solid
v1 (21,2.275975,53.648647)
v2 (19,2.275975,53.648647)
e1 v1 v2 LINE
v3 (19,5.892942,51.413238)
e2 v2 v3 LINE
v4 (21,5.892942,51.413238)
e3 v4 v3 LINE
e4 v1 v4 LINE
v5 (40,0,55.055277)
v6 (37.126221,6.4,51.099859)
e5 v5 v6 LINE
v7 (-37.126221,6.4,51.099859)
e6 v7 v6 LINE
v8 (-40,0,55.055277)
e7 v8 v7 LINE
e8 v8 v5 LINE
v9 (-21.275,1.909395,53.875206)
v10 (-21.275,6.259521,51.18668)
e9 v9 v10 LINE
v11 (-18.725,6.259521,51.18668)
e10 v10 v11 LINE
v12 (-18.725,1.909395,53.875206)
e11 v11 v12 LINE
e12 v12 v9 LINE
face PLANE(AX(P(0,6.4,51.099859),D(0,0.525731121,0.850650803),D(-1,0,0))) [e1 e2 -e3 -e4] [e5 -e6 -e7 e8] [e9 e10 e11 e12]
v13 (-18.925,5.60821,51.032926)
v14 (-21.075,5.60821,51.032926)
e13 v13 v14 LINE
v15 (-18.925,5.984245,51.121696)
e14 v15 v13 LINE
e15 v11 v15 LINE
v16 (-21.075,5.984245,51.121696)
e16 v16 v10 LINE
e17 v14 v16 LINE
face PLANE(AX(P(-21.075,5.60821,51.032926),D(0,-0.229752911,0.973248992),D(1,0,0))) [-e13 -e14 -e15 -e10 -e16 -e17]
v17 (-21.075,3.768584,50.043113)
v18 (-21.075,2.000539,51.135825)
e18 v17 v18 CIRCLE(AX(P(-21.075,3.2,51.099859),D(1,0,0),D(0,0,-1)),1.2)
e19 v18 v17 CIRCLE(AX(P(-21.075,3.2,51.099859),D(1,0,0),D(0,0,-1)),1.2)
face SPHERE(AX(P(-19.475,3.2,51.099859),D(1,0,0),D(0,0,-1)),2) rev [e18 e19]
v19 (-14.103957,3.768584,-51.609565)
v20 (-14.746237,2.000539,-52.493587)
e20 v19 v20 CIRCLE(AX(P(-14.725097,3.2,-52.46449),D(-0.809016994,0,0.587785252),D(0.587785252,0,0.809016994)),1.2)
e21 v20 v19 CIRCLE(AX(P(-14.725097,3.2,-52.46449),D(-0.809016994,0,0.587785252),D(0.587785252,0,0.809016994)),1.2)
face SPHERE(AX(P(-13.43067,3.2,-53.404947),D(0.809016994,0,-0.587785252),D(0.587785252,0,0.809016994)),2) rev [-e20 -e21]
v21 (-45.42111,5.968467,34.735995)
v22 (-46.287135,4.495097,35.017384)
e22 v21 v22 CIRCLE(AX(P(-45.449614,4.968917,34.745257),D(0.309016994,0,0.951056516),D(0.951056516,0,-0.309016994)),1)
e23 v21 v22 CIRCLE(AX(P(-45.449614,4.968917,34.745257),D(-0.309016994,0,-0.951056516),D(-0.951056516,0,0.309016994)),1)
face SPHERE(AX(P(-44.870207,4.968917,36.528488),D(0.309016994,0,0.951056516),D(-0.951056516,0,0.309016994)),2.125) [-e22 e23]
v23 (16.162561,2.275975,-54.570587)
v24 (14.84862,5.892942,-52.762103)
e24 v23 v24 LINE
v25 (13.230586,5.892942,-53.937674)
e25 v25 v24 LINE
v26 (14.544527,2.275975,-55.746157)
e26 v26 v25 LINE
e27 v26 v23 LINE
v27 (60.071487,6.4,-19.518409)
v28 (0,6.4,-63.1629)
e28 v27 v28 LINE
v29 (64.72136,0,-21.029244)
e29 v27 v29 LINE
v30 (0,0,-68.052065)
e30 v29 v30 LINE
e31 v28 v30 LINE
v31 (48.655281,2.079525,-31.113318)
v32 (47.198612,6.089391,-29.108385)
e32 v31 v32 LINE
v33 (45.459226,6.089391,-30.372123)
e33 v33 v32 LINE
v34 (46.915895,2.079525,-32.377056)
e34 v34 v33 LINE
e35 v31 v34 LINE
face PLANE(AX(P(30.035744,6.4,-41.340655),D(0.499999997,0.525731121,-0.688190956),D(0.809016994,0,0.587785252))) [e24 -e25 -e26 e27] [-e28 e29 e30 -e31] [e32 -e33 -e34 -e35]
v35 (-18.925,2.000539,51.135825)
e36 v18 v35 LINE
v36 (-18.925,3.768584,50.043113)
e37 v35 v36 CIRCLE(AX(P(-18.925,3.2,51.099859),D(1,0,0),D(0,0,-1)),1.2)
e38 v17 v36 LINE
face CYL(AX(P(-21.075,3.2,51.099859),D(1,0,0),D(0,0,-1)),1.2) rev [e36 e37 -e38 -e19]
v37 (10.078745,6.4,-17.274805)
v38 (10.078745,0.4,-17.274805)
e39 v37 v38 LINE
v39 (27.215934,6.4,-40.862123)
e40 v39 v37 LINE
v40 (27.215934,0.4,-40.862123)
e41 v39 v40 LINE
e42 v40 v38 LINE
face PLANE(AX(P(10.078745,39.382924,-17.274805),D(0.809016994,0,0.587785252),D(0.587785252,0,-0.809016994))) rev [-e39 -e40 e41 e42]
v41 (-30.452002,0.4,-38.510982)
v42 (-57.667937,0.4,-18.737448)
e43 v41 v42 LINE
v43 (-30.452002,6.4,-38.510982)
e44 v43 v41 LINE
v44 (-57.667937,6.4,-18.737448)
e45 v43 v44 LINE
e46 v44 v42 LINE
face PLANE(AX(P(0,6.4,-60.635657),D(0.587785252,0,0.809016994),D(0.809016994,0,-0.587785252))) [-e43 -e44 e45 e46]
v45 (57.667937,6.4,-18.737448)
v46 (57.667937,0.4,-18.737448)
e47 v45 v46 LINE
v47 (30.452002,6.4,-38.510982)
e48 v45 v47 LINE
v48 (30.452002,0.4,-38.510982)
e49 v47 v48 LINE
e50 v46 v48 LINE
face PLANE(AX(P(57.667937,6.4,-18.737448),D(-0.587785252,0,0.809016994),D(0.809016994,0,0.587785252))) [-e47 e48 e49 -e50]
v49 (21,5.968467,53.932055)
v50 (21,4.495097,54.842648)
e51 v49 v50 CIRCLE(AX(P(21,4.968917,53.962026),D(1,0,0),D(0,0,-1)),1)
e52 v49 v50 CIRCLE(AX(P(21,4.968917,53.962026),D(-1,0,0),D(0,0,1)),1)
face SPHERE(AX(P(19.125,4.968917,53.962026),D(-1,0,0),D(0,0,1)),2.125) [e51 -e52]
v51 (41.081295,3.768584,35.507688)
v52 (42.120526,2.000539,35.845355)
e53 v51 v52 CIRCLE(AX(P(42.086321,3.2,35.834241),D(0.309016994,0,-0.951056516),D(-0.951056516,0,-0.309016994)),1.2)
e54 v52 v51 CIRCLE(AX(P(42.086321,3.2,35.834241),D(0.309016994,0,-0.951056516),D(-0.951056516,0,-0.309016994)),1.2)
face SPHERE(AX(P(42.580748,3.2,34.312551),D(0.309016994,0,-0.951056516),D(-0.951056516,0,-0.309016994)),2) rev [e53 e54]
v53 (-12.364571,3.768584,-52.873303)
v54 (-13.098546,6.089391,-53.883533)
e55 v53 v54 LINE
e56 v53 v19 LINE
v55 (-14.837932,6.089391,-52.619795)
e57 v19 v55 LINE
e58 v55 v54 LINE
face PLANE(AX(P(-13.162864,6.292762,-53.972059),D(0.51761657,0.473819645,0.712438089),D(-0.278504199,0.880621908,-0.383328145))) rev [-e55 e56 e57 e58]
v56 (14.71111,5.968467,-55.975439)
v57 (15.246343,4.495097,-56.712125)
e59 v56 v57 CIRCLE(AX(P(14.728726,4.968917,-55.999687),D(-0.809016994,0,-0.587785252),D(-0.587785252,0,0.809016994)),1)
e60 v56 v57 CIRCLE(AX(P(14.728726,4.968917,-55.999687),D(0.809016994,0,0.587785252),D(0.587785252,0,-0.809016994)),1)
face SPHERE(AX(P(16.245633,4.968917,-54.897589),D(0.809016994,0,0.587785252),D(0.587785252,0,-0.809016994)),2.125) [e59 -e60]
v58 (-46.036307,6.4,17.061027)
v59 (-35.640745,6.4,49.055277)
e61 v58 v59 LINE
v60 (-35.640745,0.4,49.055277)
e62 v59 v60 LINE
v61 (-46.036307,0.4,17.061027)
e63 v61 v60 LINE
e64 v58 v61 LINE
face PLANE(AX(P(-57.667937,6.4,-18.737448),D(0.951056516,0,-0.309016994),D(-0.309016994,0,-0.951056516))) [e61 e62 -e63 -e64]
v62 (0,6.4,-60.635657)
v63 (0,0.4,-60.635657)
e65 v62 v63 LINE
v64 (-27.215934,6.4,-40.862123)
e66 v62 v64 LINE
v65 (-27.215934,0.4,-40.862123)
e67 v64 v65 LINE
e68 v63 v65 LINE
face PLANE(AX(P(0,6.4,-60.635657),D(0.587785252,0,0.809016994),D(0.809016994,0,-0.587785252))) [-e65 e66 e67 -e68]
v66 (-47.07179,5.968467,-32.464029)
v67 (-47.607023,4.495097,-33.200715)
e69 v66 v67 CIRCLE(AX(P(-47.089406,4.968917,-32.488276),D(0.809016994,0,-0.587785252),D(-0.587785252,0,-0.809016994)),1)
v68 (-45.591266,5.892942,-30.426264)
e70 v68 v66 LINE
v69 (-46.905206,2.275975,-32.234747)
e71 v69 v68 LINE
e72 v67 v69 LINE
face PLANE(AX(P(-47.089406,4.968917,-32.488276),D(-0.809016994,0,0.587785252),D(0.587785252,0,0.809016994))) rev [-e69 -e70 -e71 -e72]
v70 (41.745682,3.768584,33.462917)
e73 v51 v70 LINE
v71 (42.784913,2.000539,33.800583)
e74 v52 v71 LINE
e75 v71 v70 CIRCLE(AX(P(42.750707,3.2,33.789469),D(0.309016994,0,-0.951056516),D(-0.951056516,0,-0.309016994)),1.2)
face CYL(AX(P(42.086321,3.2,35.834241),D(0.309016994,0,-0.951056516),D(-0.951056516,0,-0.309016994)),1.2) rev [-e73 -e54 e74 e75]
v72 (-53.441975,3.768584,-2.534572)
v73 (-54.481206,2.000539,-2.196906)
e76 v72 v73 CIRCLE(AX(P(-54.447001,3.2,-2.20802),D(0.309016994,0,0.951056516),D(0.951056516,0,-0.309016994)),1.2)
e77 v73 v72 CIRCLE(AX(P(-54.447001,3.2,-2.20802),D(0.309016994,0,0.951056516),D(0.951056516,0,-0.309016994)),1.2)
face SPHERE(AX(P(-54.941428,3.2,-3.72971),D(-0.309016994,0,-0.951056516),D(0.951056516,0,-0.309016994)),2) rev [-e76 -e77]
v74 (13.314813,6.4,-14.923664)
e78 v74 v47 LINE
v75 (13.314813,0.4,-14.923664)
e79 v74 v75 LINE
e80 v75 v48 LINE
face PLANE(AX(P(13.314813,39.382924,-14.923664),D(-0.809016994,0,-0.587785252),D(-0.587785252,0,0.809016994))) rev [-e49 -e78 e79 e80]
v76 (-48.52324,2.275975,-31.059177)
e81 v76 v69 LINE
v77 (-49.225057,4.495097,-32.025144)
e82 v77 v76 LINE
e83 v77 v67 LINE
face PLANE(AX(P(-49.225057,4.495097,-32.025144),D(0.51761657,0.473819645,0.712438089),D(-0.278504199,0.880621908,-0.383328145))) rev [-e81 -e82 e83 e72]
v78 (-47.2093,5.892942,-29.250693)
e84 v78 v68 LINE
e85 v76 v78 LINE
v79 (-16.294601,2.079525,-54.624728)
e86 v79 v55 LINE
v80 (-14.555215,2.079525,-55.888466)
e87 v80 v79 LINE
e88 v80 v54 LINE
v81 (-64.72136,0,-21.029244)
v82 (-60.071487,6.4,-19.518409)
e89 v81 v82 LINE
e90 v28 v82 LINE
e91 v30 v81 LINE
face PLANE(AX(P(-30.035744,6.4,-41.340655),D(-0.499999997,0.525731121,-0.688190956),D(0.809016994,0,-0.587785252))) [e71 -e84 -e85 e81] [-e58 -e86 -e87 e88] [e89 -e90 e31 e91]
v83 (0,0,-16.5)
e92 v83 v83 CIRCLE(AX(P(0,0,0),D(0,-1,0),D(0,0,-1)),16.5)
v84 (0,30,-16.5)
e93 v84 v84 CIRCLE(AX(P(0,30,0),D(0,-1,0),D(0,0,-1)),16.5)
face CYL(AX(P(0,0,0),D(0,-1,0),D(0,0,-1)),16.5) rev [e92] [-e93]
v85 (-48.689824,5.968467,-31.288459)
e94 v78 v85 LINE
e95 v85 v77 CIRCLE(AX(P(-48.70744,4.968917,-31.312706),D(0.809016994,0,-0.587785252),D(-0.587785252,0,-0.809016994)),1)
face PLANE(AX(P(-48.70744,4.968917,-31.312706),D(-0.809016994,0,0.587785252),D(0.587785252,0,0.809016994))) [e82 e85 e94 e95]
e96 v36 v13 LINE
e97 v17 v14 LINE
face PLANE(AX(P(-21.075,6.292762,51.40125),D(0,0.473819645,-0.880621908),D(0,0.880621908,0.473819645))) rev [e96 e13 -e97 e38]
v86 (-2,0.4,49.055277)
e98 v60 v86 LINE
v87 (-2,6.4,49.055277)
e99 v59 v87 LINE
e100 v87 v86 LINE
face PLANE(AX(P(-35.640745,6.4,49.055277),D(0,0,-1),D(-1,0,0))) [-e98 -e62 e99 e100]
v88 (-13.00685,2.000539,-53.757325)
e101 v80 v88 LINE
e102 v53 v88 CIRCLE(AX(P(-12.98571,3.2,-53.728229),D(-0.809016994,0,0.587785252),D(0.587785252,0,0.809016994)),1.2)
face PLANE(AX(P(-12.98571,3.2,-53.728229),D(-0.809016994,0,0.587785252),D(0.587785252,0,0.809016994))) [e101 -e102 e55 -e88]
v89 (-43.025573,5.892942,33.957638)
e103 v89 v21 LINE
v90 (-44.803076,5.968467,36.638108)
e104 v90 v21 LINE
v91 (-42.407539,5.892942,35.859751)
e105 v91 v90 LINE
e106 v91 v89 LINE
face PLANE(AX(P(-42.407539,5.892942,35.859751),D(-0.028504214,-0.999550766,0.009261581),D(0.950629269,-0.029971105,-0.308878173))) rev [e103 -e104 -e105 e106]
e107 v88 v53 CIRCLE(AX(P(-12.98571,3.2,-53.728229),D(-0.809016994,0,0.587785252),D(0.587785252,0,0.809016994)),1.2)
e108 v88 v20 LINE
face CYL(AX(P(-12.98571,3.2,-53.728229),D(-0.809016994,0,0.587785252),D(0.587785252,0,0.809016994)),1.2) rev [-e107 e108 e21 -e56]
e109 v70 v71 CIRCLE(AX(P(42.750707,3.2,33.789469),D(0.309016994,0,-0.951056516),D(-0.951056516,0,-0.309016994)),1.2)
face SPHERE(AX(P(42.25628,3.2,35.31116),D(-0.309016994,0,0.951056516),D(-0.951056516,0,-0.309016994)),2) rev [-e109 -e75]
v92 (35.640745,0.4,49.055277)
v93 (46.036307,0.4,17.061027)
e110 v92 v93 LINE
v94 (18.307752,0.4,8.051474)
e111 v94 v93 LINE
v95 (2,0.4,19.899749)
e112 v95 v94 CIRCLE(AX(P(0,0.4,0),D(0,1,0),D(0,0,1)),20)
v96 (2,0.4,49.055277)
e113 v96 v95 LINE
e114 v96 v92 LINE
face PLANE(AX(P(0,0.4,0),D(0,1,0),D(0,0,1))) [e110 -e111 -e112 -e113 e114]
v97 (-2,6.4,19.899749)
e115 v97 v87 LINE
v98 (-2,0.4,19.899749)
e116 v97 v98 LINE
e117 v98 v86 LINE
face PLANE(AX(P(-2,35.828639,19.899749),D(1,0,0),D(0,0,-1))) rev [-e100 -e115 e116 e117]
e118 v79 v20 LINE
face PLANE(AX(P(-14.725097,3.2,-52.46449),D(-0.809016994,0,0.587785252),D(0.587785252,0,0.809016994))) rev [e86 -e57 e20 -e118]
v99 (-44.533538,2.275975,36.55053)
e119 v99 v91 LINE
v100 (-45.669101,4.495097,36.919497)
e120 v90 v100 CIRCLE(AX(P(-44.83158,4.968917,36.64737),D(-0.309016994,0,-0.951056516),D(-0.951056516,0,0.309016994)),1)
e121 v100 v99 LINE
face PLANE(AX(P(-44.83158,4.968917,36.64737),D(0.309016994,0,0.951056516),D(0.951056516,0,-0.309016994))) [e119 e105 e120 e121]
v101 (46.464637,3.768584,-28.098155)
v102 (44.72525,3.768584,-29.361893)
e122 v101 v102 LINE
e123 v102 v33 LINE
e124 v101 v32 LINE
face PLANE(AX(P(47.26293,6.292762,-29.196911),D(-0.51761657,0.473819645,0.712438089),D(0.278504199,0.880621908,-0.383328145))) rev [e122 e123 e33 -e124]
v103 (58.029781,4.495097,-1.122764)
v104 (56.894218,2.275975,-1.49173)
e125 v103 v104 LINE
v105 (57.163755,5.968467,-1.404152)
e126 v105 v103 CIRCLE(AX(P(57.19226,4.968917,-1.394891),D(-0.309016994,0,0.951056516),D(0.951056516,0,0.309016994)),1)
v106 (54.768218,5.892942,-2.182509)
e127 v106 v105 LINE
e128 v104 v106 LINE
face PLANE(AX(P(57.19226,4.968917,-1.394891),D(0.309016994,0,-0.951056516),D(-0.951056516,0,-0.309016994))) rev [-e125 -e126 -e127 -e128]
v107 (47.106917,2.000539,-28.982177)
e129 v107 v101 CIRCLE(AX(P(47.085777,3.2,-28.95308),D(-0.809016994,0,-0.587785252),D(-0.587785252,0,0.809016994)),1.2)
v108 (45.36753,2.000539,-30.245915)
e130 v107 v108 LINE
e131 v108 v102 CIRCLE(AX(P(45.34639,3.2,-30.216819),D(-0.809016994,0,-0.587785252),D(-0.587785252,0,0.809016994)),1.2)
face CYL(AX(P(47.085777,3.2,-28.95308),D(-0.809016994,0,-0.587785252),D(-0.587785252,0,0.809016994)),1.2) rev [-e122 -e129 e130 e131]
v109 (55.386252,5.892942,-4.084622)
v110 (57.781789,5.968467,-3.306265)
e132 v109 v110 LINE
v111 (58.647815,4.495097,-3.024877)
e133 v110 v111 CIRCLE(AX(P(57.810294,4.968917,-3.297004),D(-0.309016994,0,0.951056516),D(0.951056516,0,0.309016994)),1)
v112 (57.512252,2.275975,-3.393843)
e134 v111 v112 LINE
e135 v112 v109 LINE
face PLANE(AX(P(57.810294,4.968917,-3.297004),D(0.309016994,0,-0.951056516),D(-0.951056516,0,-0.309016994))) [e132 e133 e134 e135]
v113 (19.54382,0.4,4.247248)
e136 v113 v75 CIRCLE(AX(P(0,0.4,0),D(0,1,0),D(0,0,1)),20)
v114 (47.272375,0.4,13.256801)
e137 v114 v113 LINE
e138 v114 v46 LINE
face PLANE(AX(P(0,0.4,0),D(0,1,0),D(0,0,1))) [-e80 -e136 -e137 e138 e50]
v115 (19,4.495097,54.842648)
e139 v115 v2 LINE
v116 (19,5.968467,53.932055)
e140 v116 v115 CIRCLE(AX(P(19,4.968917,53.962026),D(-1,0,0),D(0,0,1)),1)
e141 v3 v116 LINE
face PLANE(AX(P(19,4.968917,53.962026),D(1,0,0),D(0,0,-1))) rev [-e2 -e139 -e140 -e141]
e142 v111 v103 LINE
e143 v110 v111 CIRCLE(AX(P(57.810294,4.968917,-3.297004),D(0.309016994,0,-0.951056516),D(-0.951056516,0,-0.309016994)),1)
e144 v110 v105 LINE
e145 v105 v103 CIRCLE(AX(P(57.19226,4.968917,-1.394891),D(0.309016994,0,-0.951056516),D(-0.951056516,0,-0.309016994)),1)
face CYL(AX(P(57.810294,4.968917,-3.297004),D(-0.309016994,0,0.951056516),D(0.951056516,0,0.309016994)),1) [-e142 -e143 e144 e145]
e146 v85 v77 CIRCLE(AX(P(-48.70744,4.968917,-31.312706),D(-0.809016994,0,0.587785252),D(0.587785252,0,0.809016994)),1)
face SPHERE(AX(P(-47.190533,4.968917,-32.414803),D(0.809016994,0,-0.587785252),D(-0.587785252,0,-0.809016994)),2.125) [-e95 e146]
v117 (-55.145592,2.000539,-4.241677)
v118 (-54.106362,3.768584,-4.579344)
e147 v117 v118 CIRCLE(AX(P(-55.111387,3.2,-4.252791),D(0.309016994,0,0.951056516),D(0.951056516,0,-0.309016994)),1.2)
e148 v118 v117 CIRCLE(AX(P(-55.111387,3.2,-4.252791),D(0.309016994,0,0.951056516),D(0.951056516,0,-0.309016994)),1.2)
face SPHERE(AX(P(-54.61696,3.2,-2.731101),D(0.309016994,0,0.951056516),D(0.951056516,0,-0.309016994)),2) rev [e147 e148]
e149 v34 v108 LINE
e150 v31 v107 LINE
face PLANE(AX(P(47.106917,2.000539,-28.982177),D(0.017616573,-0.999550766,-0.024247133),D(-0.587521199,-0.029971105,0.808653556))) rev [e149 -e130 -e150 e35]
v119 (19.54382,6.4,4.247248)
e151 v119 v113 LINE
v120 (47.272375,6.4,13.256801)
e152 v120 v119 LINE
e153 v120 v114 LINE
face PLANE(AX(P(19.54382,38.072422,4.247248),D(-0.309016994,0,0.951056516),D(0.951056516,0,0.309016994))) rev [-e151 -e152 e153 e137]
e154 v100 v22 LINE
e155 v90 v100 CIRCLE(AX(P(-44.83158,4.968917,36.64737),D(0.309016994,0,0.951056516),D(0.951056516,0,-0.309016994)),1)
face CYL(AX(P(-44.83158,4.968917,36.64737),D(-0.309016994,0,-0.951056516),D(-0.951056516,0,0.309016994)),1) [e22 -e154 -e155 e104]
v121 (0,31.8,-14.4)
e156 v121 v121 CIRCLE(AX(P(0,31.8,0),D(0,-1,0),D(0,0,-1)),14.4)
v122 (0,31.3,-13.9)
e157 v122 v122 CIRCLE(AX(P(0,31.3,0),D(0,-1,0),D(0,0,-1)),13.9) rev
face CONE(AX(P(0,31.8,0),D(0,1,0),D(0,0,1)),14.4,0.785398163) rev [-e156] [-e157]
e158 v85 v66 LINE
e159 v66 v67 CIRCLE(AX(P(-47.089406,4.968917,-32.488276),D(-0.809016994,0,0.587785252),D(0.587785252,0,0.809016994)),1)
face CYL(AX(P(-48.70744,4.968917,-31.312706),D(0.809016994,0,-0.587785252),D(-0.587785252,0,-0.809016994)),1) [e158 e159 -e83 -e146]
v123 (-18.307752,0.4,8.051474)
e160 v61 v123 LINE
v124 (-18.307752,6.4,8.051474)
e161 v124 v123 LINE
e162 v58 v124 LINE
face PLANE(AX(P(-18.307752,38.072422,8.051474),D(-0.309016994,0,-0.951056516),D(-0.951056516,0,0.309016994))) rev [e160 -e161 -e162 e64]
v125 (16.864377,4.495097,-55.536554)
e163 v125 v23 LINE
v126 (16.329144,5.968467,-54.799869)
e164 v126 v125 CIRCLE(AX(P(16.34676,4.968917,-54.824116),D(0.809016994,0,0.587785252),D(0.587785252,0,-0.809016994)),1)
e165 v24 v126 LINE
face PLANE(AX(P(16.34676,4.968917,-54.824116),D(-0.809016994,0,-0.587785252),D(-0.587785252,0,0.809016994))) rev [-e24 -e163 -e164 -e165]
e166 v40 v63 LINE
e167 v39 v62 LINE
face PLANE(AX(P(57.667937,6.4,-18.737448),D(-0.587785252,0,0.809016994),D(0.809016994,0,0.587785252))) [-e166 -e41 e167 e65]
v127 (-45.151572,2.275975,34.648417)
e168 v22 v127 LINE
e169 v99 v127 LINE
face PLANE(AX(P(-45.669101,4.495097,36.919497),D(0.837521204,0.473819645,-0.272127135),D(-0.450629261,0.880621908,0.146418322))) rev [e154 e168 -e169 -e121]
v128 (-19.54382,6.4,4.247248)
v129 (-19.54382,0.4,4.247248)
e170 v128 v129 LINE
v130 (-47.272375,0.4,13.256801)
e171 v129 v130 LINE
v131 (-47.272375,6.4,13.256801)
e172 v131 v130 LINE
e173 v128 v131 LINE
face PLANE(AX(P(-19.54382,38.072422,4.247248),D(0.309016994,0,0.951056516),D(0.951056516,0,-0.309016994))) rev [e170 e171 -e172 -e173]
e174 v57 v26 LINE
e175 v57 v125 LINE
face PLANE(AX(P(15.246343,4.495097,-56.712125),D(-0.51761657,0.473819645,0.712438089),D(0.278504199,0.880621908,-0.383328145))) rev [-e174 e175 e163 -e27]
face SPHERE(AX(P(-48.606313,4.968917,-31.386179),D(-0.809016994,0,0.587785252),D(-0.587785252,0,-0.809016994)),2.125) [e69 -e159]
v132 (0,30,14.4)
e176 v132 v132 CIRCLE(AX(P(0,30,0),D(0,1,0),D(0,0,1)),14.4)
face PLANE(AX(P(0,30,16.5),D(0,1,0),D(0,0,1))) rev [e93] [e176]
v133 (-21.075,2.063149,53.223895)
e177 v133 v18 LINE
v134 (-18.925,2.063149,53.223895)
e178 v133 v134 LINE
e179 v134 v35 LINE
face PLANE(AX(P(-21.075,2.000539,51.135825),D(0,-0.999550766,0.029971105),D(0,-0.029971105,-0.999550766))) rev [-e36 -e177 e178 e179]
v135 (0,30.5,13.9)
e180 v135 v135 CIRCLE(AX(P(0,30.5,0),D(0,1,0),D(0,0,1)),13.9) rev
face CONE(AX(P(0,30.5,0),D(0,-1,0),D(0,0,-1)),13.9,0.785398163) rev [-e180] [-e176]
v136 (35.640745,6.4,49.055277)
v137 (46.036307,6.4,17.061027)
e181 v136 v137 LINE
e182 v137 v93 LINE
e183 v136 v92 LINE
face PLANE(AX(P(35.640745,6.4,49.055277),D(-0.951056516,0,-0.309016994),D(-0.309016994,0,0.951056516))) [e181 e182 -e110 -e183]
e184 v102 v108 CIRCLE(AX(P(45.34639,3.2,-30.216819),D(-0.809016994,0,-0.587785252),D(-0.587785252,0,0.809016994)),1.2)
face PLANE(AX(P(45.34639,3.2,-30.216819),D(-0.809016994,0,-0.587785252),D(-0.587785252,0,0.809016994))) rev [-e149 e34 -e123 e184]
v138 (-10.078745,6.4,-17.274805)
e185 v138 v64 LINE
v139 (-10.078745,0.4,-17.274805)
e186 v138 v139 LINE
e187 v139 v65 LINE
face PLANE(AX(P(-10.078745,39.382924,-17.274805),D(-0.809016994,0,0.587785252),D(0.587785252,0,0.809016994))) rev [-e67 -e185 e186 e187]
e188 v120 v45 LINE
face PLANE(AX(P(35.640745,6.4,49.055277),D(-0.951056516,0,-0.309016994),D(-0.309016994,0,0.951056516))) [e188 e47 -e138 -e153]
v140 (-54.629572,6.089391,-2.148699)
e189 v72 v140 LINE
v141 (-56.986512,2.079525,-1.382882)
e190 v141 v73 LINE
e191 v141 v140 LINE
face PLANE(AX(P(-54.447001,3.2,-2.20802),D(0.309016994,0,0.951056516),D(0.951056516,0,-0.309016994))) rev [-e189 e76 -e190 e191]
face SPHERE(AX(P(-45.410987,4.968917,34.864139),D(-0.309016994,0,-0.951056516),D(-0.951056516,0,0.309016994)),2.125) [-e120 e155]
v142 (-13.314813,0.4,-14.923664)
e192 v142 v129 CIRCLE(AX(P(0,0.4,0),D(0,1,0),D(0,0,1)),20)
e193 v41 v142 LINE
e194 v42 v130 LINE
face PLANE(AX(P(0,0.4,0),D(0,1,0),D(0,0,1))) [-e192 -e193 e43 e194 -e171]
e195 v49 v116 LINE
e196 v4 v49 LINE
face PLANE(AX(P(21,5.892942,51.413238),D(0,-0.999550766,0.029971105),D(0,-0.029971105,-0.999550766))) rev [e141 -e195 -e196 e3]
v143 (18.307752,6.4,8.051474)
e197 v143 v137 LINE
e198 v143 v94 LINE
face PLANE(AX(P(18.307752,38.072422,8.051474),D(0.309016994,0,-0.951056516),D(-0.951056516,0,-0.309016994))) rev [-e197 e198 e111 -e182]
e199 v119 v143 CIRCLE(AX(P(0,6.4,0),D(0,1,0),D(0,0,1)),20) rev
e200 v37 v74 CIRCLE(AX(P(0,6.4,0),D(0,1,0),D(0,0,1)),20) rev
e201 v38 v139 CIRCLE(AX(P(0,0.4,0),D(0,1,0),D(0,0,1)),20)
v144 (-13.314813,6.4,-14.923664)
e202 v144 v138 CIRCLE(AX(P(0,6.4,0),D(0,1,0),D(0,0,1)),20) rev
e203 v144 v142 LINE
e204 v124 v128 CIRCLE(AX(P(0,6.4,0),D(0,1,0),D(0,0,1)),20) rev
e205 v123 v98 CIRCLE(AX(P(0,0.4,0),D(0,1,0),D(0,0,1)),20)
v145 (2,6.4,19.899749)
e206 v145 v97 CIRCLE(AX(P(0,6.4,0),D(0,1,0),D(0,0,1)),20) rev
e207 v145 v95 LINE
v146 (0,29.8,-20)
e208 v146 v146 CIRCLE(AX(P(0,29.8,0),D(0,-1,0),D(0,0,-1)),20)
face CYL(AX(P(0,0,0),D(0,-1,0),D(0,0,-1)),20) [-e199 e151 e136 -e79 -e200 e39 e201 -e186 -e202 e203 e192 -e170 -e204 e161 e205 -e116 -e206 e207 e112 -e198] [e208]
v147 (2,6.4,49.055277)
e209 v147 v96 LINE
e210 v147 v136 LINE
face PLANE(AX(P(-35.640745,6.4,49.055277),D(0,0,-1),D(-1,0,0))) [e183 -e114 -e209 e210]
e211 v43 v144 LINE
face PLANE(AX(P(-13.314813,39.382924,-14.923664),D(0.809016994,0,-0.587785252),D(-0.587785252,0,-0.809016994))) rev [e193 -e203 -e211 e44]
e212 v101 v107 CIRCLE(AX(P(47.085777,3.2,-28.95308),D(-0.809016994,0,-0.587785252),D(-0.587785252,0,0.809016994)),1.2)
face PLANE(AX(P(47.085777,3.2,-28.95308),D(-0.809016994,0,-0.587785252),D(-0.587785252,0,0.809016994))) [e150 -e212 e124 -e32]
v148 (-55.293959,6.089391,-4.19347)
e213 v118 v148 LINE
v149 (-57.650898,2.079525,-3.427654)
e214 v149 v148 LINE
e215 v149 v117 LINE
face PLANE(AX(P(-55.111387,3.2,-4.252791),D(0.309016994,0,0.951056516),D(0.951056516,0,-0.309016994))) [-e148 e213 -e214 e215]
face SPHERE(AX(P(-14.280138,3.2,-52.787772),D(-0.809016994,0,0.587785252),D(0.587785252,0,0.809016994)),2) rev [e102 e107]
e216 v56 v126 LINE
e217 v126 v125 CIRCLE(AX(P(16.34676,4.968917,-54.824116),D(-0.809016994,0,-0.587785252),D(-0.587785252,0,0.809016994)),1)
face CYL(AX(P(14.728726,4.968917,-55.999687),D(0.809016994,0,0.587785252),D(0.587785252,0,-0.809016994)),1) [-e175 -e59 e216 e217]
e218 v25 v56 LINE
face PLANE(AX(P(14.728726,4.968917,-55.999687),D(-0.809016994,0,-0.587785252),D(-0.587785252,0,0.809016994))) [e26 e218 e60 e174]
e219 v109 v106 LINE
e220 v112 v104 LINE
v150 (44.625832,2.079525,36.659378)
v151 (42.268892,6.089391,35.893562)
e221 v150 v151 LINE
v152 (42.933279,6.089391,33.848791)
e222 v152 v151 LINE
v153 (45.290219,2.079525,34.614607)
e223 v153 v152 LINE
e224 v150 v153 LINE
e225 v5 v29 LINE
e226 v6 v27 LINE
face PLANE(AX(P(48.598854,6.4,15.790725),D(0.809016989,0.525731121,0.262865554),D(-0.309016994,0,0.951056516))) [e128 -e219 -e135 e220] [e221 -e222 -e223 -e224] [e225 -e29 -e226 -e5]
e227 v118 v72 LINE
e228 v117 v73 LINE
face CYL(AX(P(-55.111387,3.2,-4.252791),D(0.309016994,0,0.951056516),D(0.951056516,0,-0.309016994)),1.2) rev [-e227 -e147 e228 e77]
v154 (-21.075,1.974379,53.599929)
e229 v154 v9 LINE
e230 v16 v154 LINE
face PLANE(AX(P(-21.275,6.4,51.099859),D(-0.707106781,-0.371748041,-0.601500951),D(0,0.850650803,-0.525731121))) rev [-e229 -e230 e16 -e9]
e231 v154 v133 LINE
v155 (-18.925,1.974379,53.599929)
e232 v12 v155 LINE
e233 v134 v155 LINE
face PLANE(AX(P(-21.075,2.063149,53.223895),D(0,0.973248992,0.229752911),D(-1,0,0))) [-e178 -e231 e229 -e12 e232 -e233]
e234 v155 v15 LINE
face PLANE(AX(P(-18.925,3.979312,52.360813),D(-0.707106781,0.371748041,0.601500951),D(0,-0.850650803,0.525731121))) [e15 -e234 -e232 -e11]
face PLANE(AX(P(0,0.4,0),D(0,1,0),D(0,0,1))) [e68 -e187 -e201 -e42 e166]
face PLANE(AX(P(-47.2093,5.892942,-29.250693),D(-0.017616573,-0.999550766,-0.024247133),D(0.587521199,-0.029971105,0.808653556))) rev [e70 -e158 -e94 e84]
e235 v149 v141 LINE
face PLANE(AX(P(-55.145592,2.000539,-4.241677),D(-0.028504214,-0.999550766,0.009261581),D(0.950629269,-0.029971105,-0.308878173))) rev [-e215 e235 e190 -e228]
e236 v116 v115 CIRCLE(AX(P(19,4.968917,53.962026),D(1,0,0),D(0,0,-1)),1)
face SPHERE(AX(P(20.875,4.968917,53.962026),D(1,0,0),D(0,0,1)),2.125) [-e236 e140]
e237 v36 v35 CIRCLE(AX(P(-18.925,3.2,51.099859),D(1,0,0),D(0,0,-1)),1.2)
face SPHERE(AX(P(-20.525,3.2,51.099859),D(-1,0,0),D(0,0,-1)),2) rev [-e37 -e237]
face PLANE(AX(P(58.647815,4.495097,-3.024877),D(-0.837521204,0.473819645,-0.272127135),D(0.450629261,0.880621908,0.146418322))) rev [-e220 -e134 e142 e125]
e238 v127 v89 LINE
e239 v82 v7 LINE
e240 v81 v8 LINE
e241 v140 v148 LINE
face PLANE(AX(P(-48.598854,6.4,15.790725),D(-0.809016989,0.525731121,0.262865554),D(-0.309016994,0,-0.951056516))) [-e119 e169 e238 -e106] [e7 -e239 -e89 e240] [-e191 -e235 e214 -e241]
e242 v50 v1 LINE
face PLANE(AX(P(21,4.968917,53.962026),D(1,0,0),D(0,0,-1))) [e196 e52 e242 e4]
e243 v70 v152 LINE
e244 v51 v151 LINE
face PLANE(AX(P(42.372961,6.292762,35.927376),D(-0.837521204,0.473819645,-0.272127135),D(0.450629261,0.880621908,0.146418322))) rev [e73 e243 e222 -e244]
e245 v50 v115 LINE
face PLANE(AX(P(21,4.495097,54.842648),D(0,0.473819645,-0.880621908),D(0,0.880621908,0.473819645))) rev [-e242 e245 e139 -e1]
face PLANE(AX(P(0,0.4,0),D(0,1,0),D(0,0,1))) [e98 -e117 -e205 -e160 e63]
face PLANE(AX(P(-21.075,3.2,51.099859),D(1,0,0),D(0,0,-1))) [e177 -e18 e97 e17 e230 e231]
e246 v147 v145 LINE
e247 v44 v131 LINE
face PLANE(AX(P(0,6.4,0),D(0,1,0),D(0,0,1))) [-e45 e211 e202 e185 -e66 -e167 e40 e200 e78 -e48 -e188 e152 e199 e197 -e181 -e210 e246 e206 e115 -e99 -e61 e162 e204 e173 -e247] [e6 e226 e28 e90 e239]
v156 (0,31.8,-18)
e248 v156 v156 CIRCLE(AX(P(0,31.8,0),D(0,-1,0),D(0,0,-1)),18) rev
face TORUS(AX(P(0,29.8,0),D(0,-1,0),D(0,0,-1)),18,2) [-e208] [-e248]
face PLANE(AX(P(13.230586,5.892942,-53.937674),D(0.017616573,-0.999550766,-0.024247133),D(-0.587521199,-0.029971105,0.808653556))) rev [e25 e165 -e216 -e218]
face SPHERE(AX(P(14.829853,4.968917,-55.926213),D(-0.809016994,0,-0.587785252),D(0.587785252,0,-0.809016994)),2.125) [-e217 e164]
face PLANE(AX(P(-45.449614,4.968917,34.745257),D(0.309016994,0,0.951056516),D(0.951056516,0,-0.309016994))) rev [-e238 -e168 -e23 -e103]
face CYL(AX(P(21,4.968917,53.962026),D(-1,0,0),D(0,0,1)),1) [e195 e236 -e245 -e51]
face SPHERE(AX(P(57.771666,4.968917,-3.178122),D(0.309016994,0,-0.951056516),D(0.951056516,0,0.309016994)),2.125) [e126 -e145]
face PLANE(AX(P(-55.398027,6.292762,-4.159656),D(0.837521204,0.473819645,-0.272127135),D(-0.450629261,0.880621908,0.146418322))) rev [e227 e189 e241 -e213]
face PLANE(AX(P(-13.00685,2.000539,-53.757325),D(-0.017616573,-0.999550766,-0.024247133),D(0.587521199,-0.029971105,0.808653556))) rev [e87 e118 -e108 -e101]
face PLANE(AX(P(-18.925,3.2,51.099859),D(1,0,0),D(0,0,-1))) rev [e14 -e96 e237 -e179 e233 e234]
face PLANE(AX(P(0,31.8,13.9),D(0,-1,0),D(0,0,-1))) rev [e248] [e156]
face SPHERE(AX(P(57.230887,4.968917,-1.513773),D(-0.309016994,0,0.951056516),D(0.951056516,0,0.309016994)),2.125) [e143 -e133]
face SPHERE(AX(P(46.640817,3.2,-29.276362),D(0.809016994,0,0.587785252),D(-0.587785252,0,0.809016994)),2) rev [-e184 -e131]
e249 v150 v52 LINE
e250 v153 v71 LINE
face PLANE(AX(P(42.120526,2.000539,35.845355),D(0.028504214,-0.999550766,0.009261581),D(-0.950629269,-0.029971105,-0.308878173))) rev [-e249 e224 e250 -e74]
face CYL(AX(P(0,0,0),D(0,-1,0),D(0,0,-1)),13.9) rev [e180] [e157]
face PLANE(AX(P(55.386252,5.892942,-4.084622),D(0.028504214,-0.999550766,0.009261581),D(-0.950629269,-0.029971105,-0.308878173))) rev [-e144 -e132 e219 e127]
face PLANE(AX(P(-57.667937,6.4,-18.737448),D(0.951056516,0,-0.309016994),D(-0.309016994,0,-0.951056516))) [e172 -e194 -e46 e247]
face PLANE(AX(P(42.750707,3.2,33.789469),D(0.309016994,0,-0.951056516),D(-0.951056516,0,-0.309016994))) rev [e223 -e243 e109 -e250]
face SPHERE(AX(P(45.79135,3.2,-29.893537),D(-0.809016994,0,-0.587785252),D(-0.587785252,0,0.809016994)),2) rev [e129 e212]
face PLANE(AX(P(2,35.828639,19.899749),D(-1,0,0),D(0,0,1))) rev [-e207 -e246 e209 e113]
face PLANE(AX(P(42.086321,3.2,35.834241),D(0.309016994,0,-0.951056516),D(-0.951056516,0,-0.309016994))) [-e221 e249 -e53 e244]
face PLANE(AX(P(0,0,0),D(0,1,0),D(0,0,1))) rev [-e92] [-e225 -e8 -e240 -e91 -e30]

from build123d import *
from OCP.BRepFilletAPI import BRepFilletAPI_MakeChamfer

# Parameters (mm, degrees)
BOSS_EXTRUDE1_DEPTH = 0.4
BOSS_EXTRUDE2_DEPTH = 6
CHAMFER1_SIZE       = 6.4
CHAMFER1_SIZE_2     = 3.955417619
BOSS_EXTRUDE3_DEPTH = 1
CUT_EXTRUDE1_DEPTH  = 1.075
CIRPATTERN1_COUNT   = 5
CHAMFER2_SIZE       = 0.2
CHAMFER2_SIZE2      = 0.546410162
CUT_EXTRUDE2_REACH  = 96.106
SKETCH9_R           = 20
FILLET1_R           = 2
CHAMFER3_SIZE       = 0.5
BOSS_EXTRUDE6_DEPTH = 6
CIRPATTERN4_COUNT   = 5


with BuildPart() as part:
    # Sketch1 → Boss-Extrude1 (new body)
    with BuildSketch(Plane(origin=(0, 0, 0), x_dir=(1, 0, 0), z_dir=(0, 1, 0))):
        Polygon((0, 68.052064668), (-64.72135955, 21.029244485), (-40, -55.055276819), (40, -55.055276819), (64.72135955, 21.029244485), align=None)
    extrude(amount=BOSS_EXTRUDE1_DEPTH)

    # Sketch2 → Boss-Extrude2 (add)
    with BuildSketch(Plane(origin=(0, 0.4, 0), x_dir=(1, 0, 0), z_dir=(0, 1, 0))):
        Polygon((64.72135955, 21.029244485), (0, 68.052064668), (-64.72135955, 21.029244485), (-40, -55.055276819), (40, -55.055276819), align=None)
        Polygon((57.667936522, 18.737448417), (0, 60.635656803), (-57.667936522, 18.737448417), (-35.640744832, -49.055276819), (35.640744832, -49.055276819), align=None, mode=Mode.SUBTRACT)
    extrude(amount=BOSS_EXTRUDE2_DEPTH)

    # Chamfer1
    # the kernel refuses this chamfer: 6.4, 3.955417619 mm, written as the material it takes off along each edge
    with BuildSketch(Plane(origin=(13.387481819, 6.4, -77.778639553), x_dir=(-0.011951463674796303, -0.9997932622810094, -0.0164497785251576), z_dir=(-0.8090169943749475, 0, 0.5877852522924732)), Plane(origin=(34.886436969, 6.4, 70.793205576), x_dir=(0.019337874441129724, -0.9997932622810094, 0.006283256289201955), z_dir=(0.30901699437494756, 0, -0.9510565162951536)), Plane(origin=(-56.547837576, 6.4, 55.055276819), x_dir=(0, -0.9997932622810094, 0.020333044471910092), z_dir=(1, 0, 0)), Plane(origin=(-69.834922581, 6.4, -36.767173242), x_dir=(-0.019337874441129724, -0.9997932622810094, 0.006283256289201957), z_dir=(0.3090169943749477, 0, 0.9510565162951535))) as chamfer1_piece_1:
        Polygon((CHAMFER1_SIZE * 0.999793262281, CHAMFER1_SIZE * 0.0203330444719), (-CHAMFER1_SIZE_2 * 0.0203330444711, CHAMFER1_SIZE_2 * 0.999793262243), (0, 0), align=None)
    extrude(amount=113.095675152, mode=Mode.SUBTRACT)
    with BuildSketch(Plane(origin=(78.108841369, 6.4, -11.3026696), x_dir=(-0.586953868721804, 0.05316829695991145, 0.8078726930593024), z_dir=(-0.8090169943749477, 0, -0.5877852522924728))) as chamfer1_piece_2:
        Polygon((CHAMFER1_SIZE_2 * 0.998585565749, -CHAMFER1_SIZE_2 * 0.0531682969579), (-CHAMFER1_SIZE * 0.0531682969599, -CHAMFER1_SIZE * 0.998585565787), (0, 0), align=None)
    extrude(amount=113.095675152, mode=Mode.SUBTRACT)

    # Sketch3 → Boss-Extrude3 (add, symmetric)
    with BuildSketch(Plane(origin=(20, 0, 0), x_dir=(0, 0, -1), z_dir=(1, 0, 0))):
        with BuildLine():
            Line((-54.842648148, 4.495096909), (-53.648646953, 2.275974881))
            Line((-53.648646953, 2.275974881), (-51.413238488, 5.892941672))
            Line((-51.413238488, 5.892941672), (-53.932055136, 5.968467319))
            ThreePointArc((-53.932055136, 5.968467319), (-54.812677044, 5.494647674), (-54.842648148, 4.495096909))
        make_face()
    boss_extrude3 = extrude(amount=BOSS_EXTRUDE3_DEPTH, both=True)

    # Sketch5 → Revolve1 (revolve)
    with BuildSketch(Plane(origin=(0, 4.968916553, 0), x_dir=(-1, 0, 0), z_dir=(0, 1, 0))):
        with BuildLine():
            Line((-21, 54.962026241), (-21, 53.962026241))
            Line((-21, 53.962026241), (-21.25, 53.962026241))
            ThreePointArc((-21.25, 53.962026241), (-21.186552813, 54.477414444), (-21, 54.962026241))
        make_face()
    revolve1 = revolve(axis=Axis((21, 4.968916553, 53.962026241), (1, 0, 0)))

    # Mirror1: Revolve1 across plane
    add(revolve1.mirror(Plane(origin=(20, 0, 0), x_dir=(0, 0, 1), z_dir=(1, 0, 0))))

    # Sketch6 → Cut-Extrude1 (cut, symmetric)
    with BuildSketch(Plane(origin=(-20, 0, 0), x_dir=(0, 0, -1), z_dir=(1, 0, 0))):
        with BuildLine():
            Line((-51.401250046, 6.292761979), (-50.043112911, 3.768583574))
            ThreePointArc((-50.043112911, 3.768583574), (-50.079078236, 2.569122655), (-51.135824526, 2.000539081))
            Line((-51.135824526, 2.000539081), (-54.000895716, 2.086447023))
            Line((-54.000895716, 2.086447023), (-51.401250046, 6.292761979))
        make_face()
    cut_extrude1 = extrude(amount=CUT_EXTRUDE1_DEPTH, both=True, mode=Mode.SUBTRACT)

    # Sketch8 → Cut-Revolve1 (revolve, cut)
    with BuildSketch(Plane(origin=(0, 3.2, 0), x_dir=(1, 0, 0), z_dir=(0, 1, 0))):
        with BuildLine():
            Line((-21.075, -51.0998592), (-21.475, -51.0998592))
            ThreePointArc((-21.475, -51.0998592), (-21.372366596, -50.467403668), (-21.075, -49.8998592))
            Line((-21.075, -49.8998592), (-21.075, -51.0998592))
        make_face()
    cut_revolve1 = revolve(axis=Axis((-21.075, 3.2, 51.0998592), (-1, 0, 0)), mode=Mode.SUBTRACT)

    # Mirror2: Cut-Revolve1 across plane
    add(cut_revolve1.mirror(Plane(origin=(-20, 0, 0), x_dir=(0, 0, 1), z_dir=(1, 0, 0))), mode=Mode.SUBTRACT)

    # CirPattern1: Boss-Extrude3, Revolve1, Cut-Extrude1, Cut-Revolve1 ×5 about axis
    cirpattern1_axis = Axis((0, 0, 0), (0, 1, 0))
    add([boss_extrude3.rotate(cirpattern1_axis, i * 360 / CIRPATTERN1_COUNT) for i in range(1, CIRPATTERN1_COUNT)])
    add([revolve1.rotate(cirpattern1_axis, i * 360 / CIRPATTERN1_COUNT) for i in range(1, CIRPATTERN1_COUNT)])
    add([cut_extrude1.rotate(cirpattern1_axis, i * 360 / CIRPATTERN1_COUNT) for i in range(1, CIRPATTERN1_COUNT)], mode=Mode.SUBTRACT)
    add([cut_revolve1.rotate(cirpattern1_axis, i * 360 / CIRPATTERN1_COUNT) for i in range(1, CIRPATTERN1_COUNT)], mode=Mode.SUBTRACT)

    # CirPattern1 copy 1 sketch → CirPattern1 copy 1 (revolve)
    with BuildSketch(Plane(origin=(12.360679775, 4.968916553, -38.042260652), x_dir=(0.30901699437494745, 0, -0.9510565162951535), z_dir=(0, 1, 0))):
        with BuildLine():
            Line((-21, -54.962026241), (-21, -53.962026241))
            Line((-21, -53.962026241), (-21.25, -53.962026241))
            ThreePointArc((-21.25, -53.962026241), (-21.186552813, -54.477414444), (-21, -54.962026241))
        make_face()
    revolve(axis=Axis((57.192259582, 4.968916553, -1.39489065), (0.30901699437494745, 0, -0.9510565162951535)))

    # CirPattern1 copy 2 sketch → CirPattern1 copy 2 (revolve)
    with BuildSketch(Plane(origin=(-32.360679775, 4.968916553, -23.511410092), x_dir=(-0.8090169943749473, 0, -0.5877852522924732), z_dir=(0, 1, 0))):
        with BuildLine():
            Line((-21, -54.962026241), (-21, -53.962026241))
            Line((-21, -53.962026241), (-21.25, -53.962026241))
            ThreePointArc((-21.25, -53.962026241), (-21.186552813, -54.477414444), (-21, -54.962026241))
        make_face()
    revolve(axis=Axis((16.346760315, 4.968916553, -54.824116073), (-0.8090169943749473, 0, -0.5877852522924732)))

    # CirPattern1 copy 3 sketch → CirPattern1 copy 3 (revolve)
    with BuildSketch(Plane(origin=(-32.360679775, 4.968916553, 23.511410092), x_dir=(-0.8090169943749476, 0, 0.587785252292473), z_dir=(0, 1, 0))):
        with BuildLine():
            Line((-21, -54.962026241), (-21, -53.962026241))
            Line((-21, -53.962026241), (-21.25, -53.962026241))
            ThreePointArc((-21.25, -53.962026241), (-21.186552813, -54.477414444), (-21, -54.962026241))
        make_face()
    revolve(axis=Axis((-47.089406101, 4.968916553, -32.488276486), (-0.8090169943749476, 0, 0.587785252292473)))

    # CirPattern1 copy 4 sketch → CirPattern1 copy 4 (revolve)
    with BuildSketch(Plane(origin=(12.360679775, 4.968916553, 38.042260652), x_dir=(0.30901699437494723, 0, 0.9510565162951536), z_dir=(0, 1, 0))):
        with BuildLine():
            Line((-21, -54.962026241), (-21, -53.962026241))
            Line((-21, -53.962026241), (-21.25, -53.962026241))
            ThreePointArc((-21.25, -53.962026241), (-21.186552813, -54.477414444), (-21, -54.962026241))
        make_face()
    revolve(axis=Axis((-45.449613795, 4.968916553, 34.745256969), (0.30901699437494723, 0, 0.9510565162951536)))

    # CirPattern1 copy 5 sketch → CirPattern1 copy 5 (revolve, cut)
    with BuildSketch(Plane(origin=(-12.360679775, 3.2, 38.042260652), x_dir=(-0.30901699437494745, 0, 0.9510565162951535), z_dir=(0, 1, 0))):
        with BuildLine():
            Line((-21.075, 51.0998592), (-21.475, 51.0998592))
            ThreePointArc((-21.475, 51.0998592), (-21.372366596, 50.467403668), (-21.075, 49.8998592))
            Line((-21.075, 49.8998592), (-21.075, 51.0998592))
        make_face()
    revolve(axis=Axis((42.750707455, 3.2, 33.789469474), (-0.30901699437494745, 0, 0.9510565162951535)), mode=Mode.SUBTRACT)

    # CirPattern1 copy 6 sketch → CirPattern1 copy 6 (revolve, cut)
    with BuildSketch(Plane(origin=(32.360679775, 3.2, 23.511410092), x_dir=(0.8090169943749473, 0, 0.5877852522924732), z_dir=(0, 1, 0))):
        with BuildLine():
            Line((-21.075, 51.0998592), (-21.475, 51.0998592))
            ThreePointArc((-21.475, 51.0998592), (-21.372366596, 50.467403668), (-21.075, 49.8998592))
            Line((-21.075, 49.8998592), (-21.075, 51.0998592))
        make_face()
    revolve(axis=Axis((45.346390251, 3.2, -30.216818603), (0.8090169943749473, 0, 0.5877852522924732)), mode=Mode.SUBTRACT)

    # CirPattern1 copy 7 sketch → CirPattern1 copy 7 (revolve, cut)
    with BuildSketch(Plane(origin=(32.360679775, 3.2, -23.511410092), x_dir=(0.8090169943749476, 0, -0.587785252292473), z_dir=(0, 1, 0))):
        with BuildLine():
            Line((-21.075, 51.0998592), (-21.475, 51.0998592))
            ThreePointArc((-21.475, 51.0998592), (-21.372366596, 50.467403668), (-21.075, 49.8998592))
            Line((-21.075, 49.8998592), (-21.075, 51.0998592))
        make_face()
    revolve(axis=Axis((-14.725097013, 3.2, -52.464490403), (0.8090169943749476, 0, -0.587785252292473)), mode=Mode.SUBTRACT)

    # CirPattern1 copy 8 sketch → CirPattern1 copy 8 (revolve, cut)
    with BuildSketch(Plane(origin=(-12.360679775, 3.2, -38.042260652), x_dir=(-0.30901699437494723, 0, -0.9510565162951536), z_dir=(0, 1, 0))):
        with BuildLine():
            Line((-21.075, 51.0998592), (-21.475, 51.0998592))
            ThreePointArc((-21.475, 51.0998592), (-21.372366596, 50.467403668), (-21.075, 49.8998592))
            Line((-21.075, 49.8998592), (-21.075, 51.0998592))
        make_face()
    revolve(axis=Axis((-54.447000692, 3.2, -2.208019668), (-0.30901699437494723, 0, -0.9510565162951536)), mode=Mode.SUBTRACT)

    # Chamfer2: one chamfer whose edges measure the first distance from different faces: ONE call of the kernel's chamfer builder (chamfer() names one face for all edges)
    chamfer2_edges_1 = [part.edges().sort_by_distance(p)[0] for p in [
        (-18.925, 4.084458277, 52.53094272),
        (-21.075, 4.084458277, 52.53094272),
    ]]
    chamfer2_edges_2 = [part.edges().sort_by_distance(p)[0] for p in [
        (-20, 2.079525493, 53.770059354),
        (-20, 6.08939106, 51.291826086),
    ]]
    chamfer2_side_2 = [part.faces().sort_by_distance(p)[0] for p in [
        (0.058075129, 3.129583761, 53.121087639),
    ]]
    chamfer2 = BRepFilletAPI_MakeChamfer(part.part.solid().wrapped)
    for e in chamfer2_edges_1:
        chamfer2.Add(CHAMFER2_SIZE, e.wrapped)
    for e in chamfer2_edges_2:
        chamfer2.Add(CHAMFER2_SIZE, CHAMFER2_SIZE2, e.wrapped, chamfer2_side_2[0].wrapped)  # the first distance lies on this face
    add(Compound.cast(chamfer2.Shape()), mode=Mode.REPLACE)

    # Sketch9 → Cut-Extrude2 (cut, up to next)
    with BuildSketch(Plane(origin=(0, 0.4, 0), x_dir=(1, 0, 0), z_dir=(0, 1, 0)), mode=Mode.PRIVATE) as cut_extrude2_sk1:
        with Locations(Location((0, 0, 0), (0, 0, 270))):
            Circle(SKETCH9_R)
    cut_extrude2_tool1 = extrude(cut_extrude2_sk1.sketch, amount=-CUT_EXTRUDE2_REACH, mode=Mode.PRIVATE) & part.part
    add(cut_extrude2_tool1.solids().sort_by_distance((0, 0.4, 0))[0], mode=Mode.SUBTRACT)

    # Sketch13 → Revolve2 (revolve)
    with BuildSketch(Plane(origin=(0, 0, 0), x_dir=(0, 0, -1), z_dir=(1, 0, 0)), mode=Mode.PRIVATE) as revolve2_sk:
        Polygon((-16.5, 0), (-16.5, 30), (-13.9, 30), (-13.9, 31.8), (-20, 31.8), (-20, 0), align=None)
    revolve(revolve2_sk.sketch.rotate(Axis((0, 0, 0), (0, 1, 0)), 180), axis=Axis((0, 0, 0), (0, 1, 0)))

    # Fillet1
    fillet1_edges = [part.edges().sort_by_distance(p)[0] for p in [
        (0, 31.8, 20),
    ]]
    fillet(fillet1_edges, radius=FILLET1_R)

    # Chamfer3
    chamfer3_edges = [part.edges().sort_by_distance(p)[0] for p in [
        (0, 30, 13.9),
        (0, 31.8, 13.9),
    ]]
    chamfer(chamfer3_edges, length=CHAMFER3_SIZE)

    # Sketch14 → Boss-Extrude6 (add)
    with BuildSketch(Plane(origin=(0, 0.4, 0), x_dir=(1, 0, 0), z_dir=(0, 1, 0))):
        with BuildLine():
            Line((-10.078744846, 17.274805421), (-27.215934272, 40.862123115))
            Line((-27.215934272, 40.862123115), (-30.45200225, 38.510982106))
            Line((-30.45200225, 38.510982106), (-13.314812824, 14.923664412))
            ThreePointArc((-13.314812824, 14.923664412), (-11.755705046, 16.180339887), (-10.078744846, 17.274805421))
        make_face()
    boss_extrude6 = extrude(amount=BOSS_EXTRUDE6_DEPTH)

    # CirPattern4: Boss-Extrude6 ×5 about axis
    cirpattern4_axis = Axis((0, 0, 0), (0, 1, 0))
    for i in range(1, CIRPATTERN4_COUNT):
        add(boss_extrude6.rotate(cirpattern4_axis, i * 360 / CIRPATTERN4_COUNT))


solid = part.part
